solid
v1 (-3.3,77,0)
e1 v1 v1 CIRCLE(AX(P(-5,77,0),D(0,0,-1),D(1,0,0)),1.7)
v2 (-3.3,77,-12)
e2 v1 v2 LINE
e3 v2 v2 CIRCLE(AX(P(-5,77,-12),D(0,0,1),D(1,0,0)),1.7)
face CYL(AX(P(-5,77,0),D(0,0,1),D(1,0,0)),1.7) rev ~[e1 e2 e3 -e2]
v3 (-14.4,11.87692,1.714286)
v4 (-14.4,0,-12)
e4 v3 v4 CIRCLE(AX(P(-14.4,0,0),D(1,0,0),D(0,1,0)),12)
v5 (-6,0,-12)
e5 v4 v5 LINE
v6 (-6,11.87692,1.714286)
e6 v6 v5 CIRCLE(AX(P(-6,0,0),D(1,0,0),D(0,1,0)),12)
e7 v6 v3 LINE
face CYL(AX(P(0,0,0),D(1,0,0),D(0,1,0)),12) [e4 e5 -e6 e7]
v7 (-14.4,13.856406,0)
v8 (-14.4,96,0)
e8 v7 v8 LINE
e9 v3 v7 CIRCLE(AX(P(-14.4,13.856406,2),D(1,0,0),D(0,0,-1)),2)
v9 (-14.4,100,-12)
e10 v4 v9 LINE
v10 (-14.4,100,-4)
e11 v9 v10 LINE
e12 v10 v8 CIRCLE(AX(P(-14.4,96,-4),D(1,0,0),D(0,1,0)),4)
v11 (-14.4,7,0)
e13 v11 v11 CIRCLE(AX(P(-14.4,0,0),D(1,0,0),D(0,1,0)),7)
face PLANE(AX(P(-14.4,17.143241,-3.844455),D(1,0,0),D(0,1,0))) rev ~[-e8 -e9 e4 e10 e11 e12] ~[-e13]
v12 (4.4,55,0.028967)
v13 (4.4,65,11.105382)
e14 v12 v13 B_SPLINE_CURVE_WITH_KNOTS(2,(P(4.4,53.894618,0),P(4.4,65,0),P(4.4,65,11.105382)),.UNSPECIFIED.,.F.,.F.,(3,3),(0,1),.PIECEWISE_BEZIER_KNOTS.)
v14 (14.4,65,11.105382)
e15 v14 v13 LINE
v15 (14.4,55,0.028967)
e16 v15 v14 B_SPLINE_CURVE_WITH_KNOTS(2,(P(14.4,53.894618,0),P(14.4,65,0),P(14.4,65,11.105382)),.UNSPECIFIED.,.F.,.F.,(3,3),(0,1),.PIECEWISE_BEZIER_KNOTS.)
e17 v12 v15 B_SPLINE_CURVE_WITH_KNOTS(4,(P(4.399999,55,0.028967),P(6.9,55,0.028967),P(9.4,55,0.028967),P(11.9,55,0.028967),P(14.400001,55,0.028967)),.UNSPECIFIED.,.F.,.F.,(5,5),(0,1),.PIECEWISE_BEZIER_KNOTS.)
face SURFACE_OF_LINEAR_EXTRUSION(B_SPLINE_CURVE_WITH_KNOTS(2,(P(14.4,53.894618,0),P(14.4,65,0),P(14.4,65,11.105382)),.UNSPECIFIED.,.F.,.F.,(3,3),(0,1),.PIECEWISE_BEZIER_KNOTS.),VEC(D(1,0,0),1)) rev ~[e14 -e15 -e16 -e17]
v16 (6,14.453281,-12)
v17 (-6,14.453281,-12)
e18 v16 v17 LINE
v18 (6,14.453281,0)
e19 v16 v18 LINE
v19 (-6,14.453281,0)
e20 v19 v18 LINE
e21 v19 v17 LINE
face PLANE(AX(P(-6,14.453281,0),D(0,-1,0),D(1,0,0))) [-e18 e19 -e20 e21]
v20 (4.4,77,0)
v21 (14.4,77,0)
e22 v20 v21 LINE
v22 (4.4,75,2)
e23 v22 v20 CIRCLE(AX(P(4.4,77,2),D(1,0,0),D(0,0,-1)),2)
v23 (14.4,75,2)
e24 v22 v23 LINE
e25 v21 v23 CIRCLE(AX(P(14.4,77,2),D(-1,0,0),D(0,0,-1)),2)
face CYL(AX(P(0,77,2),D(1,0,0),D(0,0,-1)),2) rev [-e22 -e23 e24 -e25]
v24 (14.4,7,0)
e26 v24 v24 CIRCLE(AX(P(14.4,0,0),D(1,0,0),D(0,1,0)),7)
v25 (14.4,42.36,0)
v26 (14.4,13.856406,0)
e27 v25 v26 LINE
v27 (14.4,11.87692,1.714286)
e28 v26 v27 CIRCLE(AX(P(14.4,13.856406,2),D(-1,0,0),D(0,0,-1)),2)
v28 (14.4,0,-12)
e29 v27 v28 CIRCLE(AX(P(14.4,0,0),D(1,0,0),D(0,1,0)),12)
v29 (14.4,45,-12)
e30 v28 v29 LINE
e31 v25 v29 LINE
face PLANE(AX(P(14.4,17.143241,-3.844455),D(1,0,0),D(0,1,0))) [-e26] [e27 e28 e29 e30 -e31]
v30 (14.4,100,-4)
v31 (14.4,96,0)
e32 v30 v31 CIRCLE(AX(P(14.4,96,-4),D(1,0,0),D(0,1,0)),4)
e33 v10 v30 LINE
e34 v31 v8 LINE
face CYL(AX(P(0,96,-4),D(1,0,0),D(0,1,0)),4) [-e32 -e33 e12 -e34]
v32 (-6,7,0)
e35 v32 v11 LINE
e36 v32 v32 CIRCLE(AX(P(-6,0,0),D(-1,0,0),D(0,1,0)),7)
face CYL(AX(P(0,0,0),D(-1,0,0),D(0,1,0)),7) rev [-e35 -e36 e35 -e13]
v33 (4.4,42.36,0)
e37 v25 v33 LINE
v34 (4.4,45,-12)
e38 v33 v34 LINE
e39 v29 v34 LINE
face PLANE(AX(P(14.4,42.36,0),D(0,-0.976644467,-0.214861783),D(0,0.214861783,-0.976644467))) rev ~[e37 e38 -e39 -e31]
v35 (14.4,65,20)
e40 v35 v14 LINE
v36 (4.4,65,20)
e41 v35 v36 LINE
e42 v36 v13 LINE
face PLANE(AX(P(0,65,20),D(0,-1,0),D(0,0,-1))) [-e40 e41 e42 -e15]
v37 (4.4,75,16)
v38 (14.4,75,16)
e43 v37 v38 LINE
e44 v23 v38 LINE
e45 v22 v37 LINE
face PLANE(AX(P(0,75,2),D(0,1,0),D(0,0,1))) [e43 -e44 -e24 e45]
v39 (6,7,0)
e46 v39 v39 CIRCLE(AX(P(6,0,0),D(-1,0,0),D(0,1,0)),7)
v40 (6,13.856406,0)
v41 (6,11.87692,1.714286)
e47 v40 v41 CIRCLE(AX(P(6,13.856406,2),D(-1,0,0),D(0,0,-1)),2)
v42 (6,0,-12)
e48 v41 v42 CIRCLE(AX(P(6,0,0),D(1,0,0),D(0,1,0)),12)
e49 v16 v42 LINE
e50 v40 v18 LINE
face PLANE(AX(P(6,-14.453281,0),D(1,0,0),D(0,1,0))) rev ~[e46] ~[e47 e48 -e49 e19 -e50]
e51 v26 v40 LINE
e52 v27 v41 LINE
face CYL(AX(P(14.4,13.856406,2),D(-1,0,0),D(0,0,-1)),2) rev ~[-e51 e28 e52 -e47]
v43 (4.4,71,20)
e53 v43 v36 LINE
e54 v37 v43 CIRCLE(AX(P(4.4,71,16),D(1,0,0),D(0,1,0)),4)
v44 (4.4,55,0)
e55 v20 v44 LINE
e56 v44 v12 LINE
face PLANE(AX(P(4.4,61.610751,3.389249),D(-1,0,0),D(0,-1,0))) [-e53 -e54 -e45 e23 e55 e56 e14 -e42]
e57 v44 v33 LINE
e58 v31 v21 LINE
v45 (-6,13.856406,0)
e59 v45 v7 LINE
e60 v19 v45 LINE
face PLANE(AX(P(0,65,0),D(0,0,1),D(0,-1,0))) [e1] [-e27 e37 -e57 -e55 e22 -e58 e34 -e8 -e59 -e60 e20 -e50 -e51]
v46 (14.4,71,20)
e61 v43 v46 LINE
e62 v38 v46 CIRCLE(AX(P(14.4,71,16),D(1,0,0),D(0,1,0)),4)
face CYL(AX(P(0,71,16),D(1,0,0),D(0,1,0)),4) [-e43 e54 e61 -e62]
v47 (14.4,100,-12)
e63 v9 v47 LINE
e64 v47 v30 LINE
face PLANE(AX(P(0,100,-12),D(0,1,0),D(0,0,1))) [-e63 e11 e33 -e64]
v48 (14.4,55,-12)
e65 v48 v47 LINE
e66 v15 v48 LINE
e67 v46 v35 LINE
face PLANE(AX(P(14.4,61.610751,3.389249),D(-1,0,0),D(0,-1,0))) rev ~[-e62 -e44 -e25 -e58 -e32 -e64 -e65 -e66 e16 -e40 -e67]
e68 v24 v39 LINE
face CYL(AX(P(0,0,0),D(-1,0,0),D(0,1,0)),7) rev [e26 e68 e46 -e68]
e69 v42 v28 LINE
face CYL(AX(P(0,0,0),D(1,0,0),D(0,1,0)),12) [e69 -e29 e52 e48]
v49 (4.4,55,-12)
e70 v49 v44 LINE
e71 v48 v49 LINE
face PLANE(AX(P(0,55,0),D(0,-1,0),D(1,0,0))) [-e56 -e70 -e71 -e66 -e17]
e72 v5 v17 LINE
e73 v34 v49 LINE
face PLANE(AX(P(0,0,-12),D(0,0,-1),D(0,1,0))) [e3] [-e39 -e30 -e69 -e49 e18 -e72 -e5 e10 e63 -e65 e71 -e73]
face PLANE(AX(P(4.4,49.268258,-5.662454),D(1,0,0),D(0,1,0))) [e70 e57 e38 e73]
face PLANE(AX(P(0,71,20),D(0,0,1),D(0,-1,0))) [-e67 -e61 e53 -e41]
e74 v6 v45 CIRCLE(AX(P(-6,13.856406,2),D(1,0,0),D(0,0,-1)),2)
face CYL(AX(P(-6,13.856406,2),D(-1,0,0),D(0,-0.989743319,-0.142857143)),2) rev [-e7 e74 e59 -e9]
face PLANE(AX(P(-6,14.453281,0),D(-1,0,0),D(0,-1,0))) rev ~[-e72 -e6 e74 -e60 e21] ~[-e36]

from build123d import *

# Parameters (mm, degrees)
F0_R         = 7
F1_DEPTH     = 14.4
F2_W         = 12
F2_H         = 26.4532811218
F2_H_2       = 2.4532811218
F3_DEPTH     = 15
F4_R         = 2
F6_DEPTH     = 25
F7_W         = 18.8
F7_H         = 33.2335345083
F7_H_2       = 13.5664814711
F8_DEPTH     = 25
F11_DEPTH    = 10
F12_T4_DEPTH = 10


# Not quite as in the source:
# - a fillet or chamfer that OpenCascade refuses, or shapes differently, is made with other operations: its cross-section is extruded or revolved along the edge and cut away or added


with BuildPart() as f1:
    # F0 (on Right) → F1 (new body, symmetric)
    with BuildSketch(Plane.YZ):
        with BuildLine():
            Line((42.36, 0), (12, 0))
            ThreePointArc((12, 0), (-8.4852813742, 8.4852813742), (0, -12))
            Line((0, -12), (47.36, -12))
            Line((47.36, -12), (42.36, 0))
        make_face()
        Circle(F0_R, mode=Mode.SUBTRACT)
        Polygon((57.36, 0), (42.36, 0), (47.36, -12), (57.36, -12), align=None)
        with BuildLine():
            Line((65, 0), (57.36, 0))
            Line((57.36, 0), (57.36, -12))
            Line((57.36, -12), (100, -12))
            Line((100, -12), (100, -4))
            ThreePointArc((100, -4), (98.8284271247, -1.1715728753), (96, 0))
            Line((96, 0), (77, 0))
            ThreePointArc((77, 0), (75.5857864376, 0.5857864376), (75, 2))
            Line((75, 2), (75, 16))
            ThreePointArc((75, 16), (73.8284271247, 18.8284271247), (71, 20))
            Line((71, 20), (65, 20))
            Line((65, 20), (65, 0))
        make_face()
    extrude(amount=F1_DEPTH, both=True)

    # F2 (on face) → F3 (cut, symmetric)
    with BuildSketch(Plane.XY):
        with Locations((0, -1.2266405609)):
            Rectangle(F2_W, F2_H)
        with Locations((0, 13.2266405609)):
            Rectangle(F2_W, F2_H_2)
    extrude(amount=F3_DEPTH, both=True, mode=Mode.SUBTRACT)

    # F4
    f4_edges = [f1.edges().sort_by_distance(p)[0] for p in [
        (10.2, 12, 0),
        (-10.2, 12, 0),
    ]]
    fillet(f4_edges, radius=F4_R)

    # F5 (on face) → F6 (cut)
    with BuildSketch(Plane.XY):
        with BuildLine():
            Line((-5, 77), (-6.7, 77))
            ThreePointArc((-6.7, 77), (-5, 75.3), (-3.3, 77))
            Line((-3.3, 77), (-5, 77))
        make_face()
        with BuildLine():
            ThreePointArc((-3.3, 77), (-5, 78.7), (-6.7, 77))
            Line((-6.7, 77), (-5, 77))
            Line((-5, 77), (-3.3, 77))
        make_face()
    extrude(amount=-F6_DEPTH, mode=Mode.SUBTRACT)

    # F7 (on face) → F8 (cut)
    with BuildSketch(Plane.XY):
        with Locations((-5, 81.6167672542)):
            Rectangle(F7_W, F7_H)
        with Locations((-5, 58.2167592645)):
            Rectangle(F7_W, F7_H_2)
    extrude(amount=F8_DEPTH, mode=Mode.SUBTRACT)

    # F10 (on face) → F11 (cut)
    with BuildSketch(Plane.YZ.offset(14.4)):
        Polygon((55, -12), (55, 0), (42.36, 0), (45, -12), align=None)
    extrude(amount=-F11_DEPTH, mode=Mode.SUBTRACT)

    # F12: fillet of radius 11.1053823869 on 1 edges, made by hand


with BuildPart() as f12_tool2:
    # F12_s3 → F12_t4 (new body)
    with BuildSketch(Plane.YZ.offset(14.4)):
        with BuildLine():
            add(Edge.make_bspline(
                [(53.8946176131, 0), (65, 0), (65, 11.1053823869)],
                knots=[0, 0, 0, 1, 1, 1], degree=2, weights=[1, 1, 1]))
            Line((65, 11.1053823869), (65, 0))
            Line((65, 0), (53.8946176131, 0))
        make_face()
    extrude(amount=-F12_T4_DEPTH)

    split(bisect_by=Plane.XZ.offset(-55), keep=Keep.BOTTOM)


with BuildPart() as f1_1:
    add(f1.part)

    # F12_t1: union F12_tool2
    add(f12_tool2.part)


solid = f1_1.part
